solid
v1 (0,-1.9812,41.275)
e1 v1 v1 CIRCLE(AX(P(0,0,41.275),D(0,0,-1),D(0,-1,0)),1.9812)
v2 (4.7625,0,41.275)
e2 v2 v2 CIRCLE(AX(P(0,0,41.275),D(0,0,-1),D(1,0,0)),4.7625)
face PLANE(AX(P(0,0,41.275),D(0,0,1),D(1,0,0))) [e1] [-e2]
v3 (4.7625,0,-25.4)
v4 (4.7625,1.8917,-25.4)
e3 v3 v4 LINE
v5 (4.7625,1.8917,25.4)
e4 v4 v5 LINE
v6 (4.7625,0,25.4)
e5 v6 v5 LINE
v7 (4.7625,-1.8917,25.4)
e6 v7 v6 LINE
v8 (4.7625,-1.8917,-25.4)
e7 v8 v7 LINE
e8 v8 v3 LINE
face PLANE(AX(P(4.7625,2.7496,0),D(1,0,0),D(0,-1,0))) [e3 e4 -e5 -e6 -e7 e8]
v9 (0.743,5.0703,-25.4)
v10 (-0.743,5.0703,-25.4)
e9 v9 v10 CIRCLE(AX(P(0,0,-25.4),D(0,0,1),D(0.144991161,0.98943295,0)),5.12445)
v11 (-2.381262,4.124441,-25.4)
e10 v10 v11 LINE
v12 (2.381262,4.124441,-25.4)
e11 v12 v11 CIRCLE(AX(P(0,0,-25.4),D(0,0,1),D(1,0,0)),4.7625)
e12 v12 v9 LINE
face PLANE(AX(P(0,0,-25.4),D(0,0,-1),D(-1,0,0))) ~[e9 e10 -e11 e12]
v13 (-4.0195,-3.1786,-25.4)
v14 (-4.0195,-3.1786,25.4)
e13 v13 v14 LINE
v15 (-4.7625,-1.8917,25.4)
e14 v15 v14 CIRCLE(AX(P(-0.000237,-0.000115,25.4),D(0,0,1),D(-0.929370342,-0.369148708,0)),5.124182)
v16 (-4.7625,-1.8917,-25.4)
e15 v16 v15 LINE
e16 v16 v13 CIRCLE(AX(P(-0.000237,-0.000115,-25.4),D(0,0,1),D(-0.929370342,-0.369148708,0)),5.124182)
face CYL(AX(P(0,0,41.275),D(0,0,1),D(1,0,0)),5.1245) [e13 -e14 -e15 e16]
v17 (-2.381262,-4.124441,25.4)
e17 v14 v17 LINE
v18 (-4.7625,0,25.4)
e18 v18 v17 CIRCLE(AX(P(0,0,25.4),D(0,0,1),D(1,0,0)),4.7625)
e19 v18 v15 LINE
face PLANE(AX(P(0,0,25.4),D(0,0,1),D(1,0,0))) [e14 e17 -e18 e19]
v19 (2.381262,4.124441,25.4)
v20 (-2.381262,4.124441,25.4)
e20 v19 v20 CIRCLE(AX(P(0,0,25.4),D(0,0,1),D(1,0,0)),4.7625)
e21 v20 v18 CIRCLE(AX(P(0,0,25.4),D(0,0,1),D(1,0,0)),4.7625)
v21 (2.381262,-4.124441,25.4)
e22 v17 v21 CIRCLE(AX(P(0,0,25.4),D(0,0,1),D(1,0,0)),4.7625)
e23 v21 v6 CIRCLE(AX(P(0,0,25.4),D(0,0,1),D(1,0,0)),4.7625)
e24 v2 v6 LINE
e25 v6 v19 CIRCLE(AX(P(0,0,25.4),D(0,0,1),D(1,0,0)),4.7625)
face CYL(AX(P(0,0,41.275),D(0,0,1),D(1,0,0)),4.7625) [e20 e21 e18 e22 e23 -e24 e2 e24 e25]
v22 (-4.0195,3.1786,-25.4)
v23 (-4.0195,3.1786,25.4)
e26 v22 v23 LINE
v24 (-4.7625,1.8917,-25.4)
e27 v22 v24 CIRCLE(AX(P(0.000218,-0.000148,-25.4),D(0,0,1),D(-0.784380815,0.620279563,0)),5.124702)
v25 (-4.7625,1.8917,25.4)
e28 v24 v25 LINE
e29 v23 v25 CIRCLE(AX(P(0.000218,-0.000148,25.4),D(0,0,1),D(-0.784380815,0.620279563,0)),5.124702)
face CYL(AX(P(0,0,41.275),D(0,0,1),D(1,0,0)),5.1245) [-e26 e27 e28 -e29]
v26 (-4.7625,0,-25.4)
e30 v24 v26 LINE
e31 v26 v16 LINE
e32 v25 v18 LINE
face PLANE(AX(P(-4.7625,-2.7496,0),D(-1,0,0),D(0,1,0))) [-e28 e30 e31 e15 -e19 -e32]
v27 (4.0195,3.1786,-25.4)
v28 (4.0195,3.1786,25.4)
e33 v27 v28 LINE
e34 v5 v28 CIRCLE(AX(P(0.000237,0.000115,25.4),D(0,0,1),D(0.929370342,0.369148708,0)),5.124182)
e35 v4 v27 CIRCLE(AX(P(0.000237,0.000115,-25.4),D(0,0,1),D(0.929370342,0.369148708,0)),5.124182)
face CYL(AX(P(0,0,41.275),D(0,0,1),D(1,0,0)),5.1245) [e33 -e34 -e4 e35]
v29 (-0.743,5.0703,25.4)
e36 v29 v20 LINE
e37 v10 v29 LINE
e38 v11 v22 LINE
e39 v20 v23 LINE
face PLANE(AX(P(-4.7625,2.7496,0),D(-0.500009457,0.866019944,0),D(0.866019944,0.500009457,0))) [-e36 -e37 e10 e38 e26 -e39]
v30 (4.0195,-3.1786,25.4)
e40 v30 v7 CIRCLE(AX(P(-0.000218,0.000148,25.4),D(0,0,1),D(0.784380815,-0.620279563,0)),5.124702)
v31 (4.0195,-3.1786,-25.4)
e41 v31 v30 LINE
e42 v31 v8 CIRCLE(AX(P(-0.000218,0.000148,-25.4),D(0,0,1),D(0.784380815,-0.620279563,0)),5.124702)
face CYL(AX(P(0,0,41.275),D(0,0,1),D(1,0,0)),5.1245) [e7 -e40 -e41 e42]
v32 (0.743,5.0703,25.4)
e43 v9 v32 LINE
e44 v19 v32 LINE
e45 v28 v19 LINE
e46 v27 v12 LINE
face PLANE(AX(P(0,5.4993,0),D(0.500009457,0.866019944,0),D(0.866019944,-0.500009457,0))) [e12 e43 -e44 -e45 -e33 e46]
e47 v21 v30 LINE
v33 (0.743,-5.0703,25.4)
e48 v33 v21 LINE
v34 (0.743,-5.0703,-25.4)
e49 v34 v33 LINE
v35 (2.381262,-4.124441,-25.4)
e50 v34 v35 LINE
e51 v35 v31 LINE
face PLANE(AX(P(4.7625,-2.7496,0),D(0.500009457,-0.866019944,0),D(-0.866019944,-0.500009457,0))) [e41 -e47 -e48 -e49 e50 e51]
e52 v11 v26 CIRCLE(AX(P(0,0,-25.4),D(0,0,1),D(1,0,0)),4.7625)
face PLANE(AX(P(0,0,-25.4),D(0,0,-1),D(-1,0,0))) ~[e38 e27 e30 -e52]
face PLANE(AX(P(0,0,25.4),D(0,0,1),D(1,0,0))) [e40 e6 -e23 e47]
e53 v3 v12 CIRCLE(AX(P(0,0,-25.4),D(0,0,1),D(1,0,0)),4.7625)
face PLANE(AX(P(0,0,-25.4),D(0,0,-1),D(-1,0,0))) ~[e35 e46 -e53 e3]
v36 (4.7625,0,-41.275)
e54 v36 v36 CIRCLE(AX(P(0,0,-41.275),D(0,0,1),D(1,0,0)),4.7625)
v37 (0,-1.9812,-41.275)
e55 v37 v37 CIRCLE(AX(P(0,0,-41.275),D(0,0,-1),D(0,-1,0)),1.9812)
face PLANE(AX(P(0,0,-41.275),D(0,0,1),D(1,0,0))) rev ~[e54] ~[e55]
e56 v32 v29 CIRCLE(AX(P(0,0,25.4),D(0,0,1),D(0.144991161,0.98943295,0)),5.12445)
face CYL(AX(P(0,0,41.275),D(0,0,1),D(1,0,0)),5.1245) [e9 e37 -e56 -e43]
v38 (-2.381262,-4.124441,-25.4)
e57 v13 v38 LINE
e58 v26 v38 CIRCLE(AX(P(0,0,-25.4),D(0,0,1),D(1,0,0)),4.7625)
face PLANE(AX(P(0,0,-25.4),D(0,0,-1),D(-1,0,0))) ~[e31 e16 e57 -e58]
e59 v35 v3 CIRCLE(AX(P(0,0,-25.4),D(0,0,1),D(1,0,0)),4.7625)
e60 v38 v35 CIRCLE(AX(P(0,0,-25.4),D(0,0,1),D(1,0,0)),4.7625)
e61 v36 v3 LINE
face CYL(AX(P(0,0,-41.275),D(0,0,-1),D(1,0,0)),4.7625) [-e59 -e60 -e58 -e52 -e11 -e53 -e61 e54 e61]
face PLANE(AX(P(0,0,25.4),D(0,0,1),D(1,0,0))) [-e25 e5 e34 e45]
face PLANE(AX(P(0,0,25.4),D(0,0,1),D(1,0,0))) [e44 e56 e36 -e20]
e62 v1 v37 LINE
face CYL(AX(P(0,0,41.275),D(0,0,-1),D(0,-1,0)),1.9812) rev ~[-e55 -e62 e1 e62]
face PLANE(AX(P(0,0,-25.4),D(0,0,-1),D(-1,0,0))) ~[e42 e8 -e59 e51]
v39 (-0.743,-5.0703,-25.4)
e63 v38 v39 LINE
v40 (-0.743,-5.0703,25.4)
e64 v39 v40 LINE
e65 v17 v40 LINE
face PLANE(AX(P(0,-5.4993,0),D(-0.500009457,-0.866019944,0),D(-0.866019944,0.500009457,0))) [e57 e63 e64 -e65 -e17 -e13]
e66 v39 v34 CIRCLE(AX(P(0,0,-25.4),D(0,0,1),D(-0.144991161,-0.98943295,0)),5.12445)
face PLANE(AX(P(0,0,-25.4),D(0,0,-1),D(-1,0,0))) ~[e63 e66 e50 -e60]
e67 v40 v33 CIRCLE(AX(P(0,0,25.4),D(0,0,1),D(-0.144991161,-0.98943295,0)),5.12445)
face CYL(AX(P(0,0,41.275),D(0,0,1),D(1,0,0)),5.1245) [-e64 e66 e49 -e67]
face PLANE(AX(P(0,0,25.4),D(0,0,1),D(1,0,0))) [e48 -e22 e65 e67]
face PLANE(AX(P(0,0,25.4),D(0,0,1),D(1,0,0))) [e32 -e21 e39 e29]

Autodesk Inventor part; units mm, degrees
ref_plane "YZ Plane" through (0, 0, 0) normal (1, 0, 0) x (0, 1, 0)
ref_plane "XZ Plane" through (0, 0, 0) normal (0, 1, 0) x (-1, 0, 0)
ref_plane "XY Plane" through (0, 0, 0) normal (0, 0, 1) x (1, 0, 0)
sketch "Sketch1" plane through (0, 0, 0) normal (0, 0, 1) x (1, 0, 0)
  line L0 (-4.7625, -2.7496) -> (-4.7625, 2.7496)
  line L1 (-4.7625, 2.7496) -> (0, 5.4993)
  line L2 (0, 5.4993) -> (4.7625, 2.7496)
  line L3 (4.7625, 2.7496) -> (4.7625, -2.7496)
  line L4 (4.7625, -2.7496) -> (0, -5.4993)
  line L5 (0, -5.4993) -> (-4.7625, -2.7496)
  point P0 (0, 0)
  point P1 (0, 0)
  dimension "Size" = 9.525
extrude "Extrusion1" add sketch "Sketch1" along normal mid plane 82.55
sketch "Sketch3" plane through (0, 0, 41.275) normal (0, 0, 1) x (1, 0, 0)
  line L0 (-4.7625, 2.7496) -> (0, 5.4993) construction
  line L1 (0, 5.4993) -> (4.7625, 2.7496) construction
  line L2 (4.7625, 2.7496) -> (4.7625, -2.7496) construction
  line L3 (4.7625, -2.7496) -> (0, -5.4993) construction
  line L4 (0, -5.4993) -> (-4.7625, -2.7496) construction
  line L5 (-4.7625, -2.7496) -> (-4.7625, 2.7496) construction
  point P0 (0, 0)
hole "Hole1" at (0, 0, 41.275) direction (0, 0, -1) diameter 3.9624 end through all thread size "10-32 UNF" class "2B" standard "ANSI Unified Screw Threads"
sketch "Sketch4" plane through (0, 0, 41.275) normal (0, 0, 1) x (1, 0, 0)
  circle A0 centre (0, 0) radius 1.9812 construction
  line L0 (-4.7625, 2.7496) -> (0, 5.4993) construction
  line L1 (0, 5.4993) -> (4.7625, 2.7496) construction
  line L2 (4.7625, 2.7496) -> (4.7625, -2.7496) construction
  line L3 (4.7625, -2.7496) -> (0, -5.4993) construction
  line L4 (0, -5.4993) -> (-4.7625, -2.7496) construction
  line L5 (-4.7625, -2.7496) -> (-4.7625, 2.7496) construction
  circle A1 centre (0, 0) radius 5.1245
  circle A2 centre (0, 0) radius 8.89
  dimension "thunder" = 10.2489
  dimension "d16" = 17.78
extrude "Extrusion3" cut sketch "Sketch4" against normal through all
sketch "Sketch5" plane through (0, 0, 41.275) normal (0, 0, 1) x (1, 0, 0)
  circle A0 centre (0, 0) radius 1.9812 projected
  circle A1 centre (0, 0) radius 4.7625
  line L0 (4.7625, -1.8917) -> (4.7625, 1.8917) projected
  line L1 (4.0195, 3.1786) -> (0.743, 5.0703) projected
  line L2 (-0.743, 5.0703) -> (-4.0195, 3.1786) projected
  line L3 (-4.7625, 1.8917) -> (-4.7625, -1.8917) projected
  line L4 (-4.0195, -3.1786) -> (-0.743, -5.0703) projected
  line L5 (0.743, -5.0703) -> (4.0195, -3.1786) projected
  circle A2 centre (0, 0) radius 1.9812 projected
  arc A3 (4.0195, -3.1786) -> (4.7625, -1.8917) centre (0, 0) ccw projected
  arc A4 (4.7625, 1.8917) -> (4.0195, 3.1786) centre (0, 0) ccw projected
  arc A5 (0.743, 5.0703) -> (-0.743, 5.0703) centre (0, 0) ccw projected
  arc A6 (-4.0195, 3.1786) -> (-4.7625, 1.8917) centre (0, 0) ccw projected
  arc A7 (-4.7625, -1.8917) -> (-4.0195, -3.1786) centre (0, 0) ccw projected
  arc A8 (-0.743, -5.0703) -> (0.743, -5.0703) centre (0, 0) ccw projected
  point P0 (2.3813, -4.1244)
  point P1 (-2.3813, -4.1244)
  point P2 (-4.7625, 0)
  point P3 (-2.3813, 4.1244)
  point P4 (2.3812, 4.1244)
  point P5 (4.7625, 0)
  dimension "d21" = 9.525
extrude "Extrusion4" cut sketch "Sketch5" against normal blind 15.875 contours L0 A3 L5 A1 | A1 L1 A4 L0 | A1 L2 A5 L1 | L5 A8 L4 A1 | A1 L3 A6 L2 | L4 A7 L3 A1
mirror "Mirror2" about plane through (0, 0, 0) normal (0, 0, 1) of "Extrusion4"
equation "\"bearing\" = 25.4"
properties part number "GP10-012" material "Aluminum 6061"
